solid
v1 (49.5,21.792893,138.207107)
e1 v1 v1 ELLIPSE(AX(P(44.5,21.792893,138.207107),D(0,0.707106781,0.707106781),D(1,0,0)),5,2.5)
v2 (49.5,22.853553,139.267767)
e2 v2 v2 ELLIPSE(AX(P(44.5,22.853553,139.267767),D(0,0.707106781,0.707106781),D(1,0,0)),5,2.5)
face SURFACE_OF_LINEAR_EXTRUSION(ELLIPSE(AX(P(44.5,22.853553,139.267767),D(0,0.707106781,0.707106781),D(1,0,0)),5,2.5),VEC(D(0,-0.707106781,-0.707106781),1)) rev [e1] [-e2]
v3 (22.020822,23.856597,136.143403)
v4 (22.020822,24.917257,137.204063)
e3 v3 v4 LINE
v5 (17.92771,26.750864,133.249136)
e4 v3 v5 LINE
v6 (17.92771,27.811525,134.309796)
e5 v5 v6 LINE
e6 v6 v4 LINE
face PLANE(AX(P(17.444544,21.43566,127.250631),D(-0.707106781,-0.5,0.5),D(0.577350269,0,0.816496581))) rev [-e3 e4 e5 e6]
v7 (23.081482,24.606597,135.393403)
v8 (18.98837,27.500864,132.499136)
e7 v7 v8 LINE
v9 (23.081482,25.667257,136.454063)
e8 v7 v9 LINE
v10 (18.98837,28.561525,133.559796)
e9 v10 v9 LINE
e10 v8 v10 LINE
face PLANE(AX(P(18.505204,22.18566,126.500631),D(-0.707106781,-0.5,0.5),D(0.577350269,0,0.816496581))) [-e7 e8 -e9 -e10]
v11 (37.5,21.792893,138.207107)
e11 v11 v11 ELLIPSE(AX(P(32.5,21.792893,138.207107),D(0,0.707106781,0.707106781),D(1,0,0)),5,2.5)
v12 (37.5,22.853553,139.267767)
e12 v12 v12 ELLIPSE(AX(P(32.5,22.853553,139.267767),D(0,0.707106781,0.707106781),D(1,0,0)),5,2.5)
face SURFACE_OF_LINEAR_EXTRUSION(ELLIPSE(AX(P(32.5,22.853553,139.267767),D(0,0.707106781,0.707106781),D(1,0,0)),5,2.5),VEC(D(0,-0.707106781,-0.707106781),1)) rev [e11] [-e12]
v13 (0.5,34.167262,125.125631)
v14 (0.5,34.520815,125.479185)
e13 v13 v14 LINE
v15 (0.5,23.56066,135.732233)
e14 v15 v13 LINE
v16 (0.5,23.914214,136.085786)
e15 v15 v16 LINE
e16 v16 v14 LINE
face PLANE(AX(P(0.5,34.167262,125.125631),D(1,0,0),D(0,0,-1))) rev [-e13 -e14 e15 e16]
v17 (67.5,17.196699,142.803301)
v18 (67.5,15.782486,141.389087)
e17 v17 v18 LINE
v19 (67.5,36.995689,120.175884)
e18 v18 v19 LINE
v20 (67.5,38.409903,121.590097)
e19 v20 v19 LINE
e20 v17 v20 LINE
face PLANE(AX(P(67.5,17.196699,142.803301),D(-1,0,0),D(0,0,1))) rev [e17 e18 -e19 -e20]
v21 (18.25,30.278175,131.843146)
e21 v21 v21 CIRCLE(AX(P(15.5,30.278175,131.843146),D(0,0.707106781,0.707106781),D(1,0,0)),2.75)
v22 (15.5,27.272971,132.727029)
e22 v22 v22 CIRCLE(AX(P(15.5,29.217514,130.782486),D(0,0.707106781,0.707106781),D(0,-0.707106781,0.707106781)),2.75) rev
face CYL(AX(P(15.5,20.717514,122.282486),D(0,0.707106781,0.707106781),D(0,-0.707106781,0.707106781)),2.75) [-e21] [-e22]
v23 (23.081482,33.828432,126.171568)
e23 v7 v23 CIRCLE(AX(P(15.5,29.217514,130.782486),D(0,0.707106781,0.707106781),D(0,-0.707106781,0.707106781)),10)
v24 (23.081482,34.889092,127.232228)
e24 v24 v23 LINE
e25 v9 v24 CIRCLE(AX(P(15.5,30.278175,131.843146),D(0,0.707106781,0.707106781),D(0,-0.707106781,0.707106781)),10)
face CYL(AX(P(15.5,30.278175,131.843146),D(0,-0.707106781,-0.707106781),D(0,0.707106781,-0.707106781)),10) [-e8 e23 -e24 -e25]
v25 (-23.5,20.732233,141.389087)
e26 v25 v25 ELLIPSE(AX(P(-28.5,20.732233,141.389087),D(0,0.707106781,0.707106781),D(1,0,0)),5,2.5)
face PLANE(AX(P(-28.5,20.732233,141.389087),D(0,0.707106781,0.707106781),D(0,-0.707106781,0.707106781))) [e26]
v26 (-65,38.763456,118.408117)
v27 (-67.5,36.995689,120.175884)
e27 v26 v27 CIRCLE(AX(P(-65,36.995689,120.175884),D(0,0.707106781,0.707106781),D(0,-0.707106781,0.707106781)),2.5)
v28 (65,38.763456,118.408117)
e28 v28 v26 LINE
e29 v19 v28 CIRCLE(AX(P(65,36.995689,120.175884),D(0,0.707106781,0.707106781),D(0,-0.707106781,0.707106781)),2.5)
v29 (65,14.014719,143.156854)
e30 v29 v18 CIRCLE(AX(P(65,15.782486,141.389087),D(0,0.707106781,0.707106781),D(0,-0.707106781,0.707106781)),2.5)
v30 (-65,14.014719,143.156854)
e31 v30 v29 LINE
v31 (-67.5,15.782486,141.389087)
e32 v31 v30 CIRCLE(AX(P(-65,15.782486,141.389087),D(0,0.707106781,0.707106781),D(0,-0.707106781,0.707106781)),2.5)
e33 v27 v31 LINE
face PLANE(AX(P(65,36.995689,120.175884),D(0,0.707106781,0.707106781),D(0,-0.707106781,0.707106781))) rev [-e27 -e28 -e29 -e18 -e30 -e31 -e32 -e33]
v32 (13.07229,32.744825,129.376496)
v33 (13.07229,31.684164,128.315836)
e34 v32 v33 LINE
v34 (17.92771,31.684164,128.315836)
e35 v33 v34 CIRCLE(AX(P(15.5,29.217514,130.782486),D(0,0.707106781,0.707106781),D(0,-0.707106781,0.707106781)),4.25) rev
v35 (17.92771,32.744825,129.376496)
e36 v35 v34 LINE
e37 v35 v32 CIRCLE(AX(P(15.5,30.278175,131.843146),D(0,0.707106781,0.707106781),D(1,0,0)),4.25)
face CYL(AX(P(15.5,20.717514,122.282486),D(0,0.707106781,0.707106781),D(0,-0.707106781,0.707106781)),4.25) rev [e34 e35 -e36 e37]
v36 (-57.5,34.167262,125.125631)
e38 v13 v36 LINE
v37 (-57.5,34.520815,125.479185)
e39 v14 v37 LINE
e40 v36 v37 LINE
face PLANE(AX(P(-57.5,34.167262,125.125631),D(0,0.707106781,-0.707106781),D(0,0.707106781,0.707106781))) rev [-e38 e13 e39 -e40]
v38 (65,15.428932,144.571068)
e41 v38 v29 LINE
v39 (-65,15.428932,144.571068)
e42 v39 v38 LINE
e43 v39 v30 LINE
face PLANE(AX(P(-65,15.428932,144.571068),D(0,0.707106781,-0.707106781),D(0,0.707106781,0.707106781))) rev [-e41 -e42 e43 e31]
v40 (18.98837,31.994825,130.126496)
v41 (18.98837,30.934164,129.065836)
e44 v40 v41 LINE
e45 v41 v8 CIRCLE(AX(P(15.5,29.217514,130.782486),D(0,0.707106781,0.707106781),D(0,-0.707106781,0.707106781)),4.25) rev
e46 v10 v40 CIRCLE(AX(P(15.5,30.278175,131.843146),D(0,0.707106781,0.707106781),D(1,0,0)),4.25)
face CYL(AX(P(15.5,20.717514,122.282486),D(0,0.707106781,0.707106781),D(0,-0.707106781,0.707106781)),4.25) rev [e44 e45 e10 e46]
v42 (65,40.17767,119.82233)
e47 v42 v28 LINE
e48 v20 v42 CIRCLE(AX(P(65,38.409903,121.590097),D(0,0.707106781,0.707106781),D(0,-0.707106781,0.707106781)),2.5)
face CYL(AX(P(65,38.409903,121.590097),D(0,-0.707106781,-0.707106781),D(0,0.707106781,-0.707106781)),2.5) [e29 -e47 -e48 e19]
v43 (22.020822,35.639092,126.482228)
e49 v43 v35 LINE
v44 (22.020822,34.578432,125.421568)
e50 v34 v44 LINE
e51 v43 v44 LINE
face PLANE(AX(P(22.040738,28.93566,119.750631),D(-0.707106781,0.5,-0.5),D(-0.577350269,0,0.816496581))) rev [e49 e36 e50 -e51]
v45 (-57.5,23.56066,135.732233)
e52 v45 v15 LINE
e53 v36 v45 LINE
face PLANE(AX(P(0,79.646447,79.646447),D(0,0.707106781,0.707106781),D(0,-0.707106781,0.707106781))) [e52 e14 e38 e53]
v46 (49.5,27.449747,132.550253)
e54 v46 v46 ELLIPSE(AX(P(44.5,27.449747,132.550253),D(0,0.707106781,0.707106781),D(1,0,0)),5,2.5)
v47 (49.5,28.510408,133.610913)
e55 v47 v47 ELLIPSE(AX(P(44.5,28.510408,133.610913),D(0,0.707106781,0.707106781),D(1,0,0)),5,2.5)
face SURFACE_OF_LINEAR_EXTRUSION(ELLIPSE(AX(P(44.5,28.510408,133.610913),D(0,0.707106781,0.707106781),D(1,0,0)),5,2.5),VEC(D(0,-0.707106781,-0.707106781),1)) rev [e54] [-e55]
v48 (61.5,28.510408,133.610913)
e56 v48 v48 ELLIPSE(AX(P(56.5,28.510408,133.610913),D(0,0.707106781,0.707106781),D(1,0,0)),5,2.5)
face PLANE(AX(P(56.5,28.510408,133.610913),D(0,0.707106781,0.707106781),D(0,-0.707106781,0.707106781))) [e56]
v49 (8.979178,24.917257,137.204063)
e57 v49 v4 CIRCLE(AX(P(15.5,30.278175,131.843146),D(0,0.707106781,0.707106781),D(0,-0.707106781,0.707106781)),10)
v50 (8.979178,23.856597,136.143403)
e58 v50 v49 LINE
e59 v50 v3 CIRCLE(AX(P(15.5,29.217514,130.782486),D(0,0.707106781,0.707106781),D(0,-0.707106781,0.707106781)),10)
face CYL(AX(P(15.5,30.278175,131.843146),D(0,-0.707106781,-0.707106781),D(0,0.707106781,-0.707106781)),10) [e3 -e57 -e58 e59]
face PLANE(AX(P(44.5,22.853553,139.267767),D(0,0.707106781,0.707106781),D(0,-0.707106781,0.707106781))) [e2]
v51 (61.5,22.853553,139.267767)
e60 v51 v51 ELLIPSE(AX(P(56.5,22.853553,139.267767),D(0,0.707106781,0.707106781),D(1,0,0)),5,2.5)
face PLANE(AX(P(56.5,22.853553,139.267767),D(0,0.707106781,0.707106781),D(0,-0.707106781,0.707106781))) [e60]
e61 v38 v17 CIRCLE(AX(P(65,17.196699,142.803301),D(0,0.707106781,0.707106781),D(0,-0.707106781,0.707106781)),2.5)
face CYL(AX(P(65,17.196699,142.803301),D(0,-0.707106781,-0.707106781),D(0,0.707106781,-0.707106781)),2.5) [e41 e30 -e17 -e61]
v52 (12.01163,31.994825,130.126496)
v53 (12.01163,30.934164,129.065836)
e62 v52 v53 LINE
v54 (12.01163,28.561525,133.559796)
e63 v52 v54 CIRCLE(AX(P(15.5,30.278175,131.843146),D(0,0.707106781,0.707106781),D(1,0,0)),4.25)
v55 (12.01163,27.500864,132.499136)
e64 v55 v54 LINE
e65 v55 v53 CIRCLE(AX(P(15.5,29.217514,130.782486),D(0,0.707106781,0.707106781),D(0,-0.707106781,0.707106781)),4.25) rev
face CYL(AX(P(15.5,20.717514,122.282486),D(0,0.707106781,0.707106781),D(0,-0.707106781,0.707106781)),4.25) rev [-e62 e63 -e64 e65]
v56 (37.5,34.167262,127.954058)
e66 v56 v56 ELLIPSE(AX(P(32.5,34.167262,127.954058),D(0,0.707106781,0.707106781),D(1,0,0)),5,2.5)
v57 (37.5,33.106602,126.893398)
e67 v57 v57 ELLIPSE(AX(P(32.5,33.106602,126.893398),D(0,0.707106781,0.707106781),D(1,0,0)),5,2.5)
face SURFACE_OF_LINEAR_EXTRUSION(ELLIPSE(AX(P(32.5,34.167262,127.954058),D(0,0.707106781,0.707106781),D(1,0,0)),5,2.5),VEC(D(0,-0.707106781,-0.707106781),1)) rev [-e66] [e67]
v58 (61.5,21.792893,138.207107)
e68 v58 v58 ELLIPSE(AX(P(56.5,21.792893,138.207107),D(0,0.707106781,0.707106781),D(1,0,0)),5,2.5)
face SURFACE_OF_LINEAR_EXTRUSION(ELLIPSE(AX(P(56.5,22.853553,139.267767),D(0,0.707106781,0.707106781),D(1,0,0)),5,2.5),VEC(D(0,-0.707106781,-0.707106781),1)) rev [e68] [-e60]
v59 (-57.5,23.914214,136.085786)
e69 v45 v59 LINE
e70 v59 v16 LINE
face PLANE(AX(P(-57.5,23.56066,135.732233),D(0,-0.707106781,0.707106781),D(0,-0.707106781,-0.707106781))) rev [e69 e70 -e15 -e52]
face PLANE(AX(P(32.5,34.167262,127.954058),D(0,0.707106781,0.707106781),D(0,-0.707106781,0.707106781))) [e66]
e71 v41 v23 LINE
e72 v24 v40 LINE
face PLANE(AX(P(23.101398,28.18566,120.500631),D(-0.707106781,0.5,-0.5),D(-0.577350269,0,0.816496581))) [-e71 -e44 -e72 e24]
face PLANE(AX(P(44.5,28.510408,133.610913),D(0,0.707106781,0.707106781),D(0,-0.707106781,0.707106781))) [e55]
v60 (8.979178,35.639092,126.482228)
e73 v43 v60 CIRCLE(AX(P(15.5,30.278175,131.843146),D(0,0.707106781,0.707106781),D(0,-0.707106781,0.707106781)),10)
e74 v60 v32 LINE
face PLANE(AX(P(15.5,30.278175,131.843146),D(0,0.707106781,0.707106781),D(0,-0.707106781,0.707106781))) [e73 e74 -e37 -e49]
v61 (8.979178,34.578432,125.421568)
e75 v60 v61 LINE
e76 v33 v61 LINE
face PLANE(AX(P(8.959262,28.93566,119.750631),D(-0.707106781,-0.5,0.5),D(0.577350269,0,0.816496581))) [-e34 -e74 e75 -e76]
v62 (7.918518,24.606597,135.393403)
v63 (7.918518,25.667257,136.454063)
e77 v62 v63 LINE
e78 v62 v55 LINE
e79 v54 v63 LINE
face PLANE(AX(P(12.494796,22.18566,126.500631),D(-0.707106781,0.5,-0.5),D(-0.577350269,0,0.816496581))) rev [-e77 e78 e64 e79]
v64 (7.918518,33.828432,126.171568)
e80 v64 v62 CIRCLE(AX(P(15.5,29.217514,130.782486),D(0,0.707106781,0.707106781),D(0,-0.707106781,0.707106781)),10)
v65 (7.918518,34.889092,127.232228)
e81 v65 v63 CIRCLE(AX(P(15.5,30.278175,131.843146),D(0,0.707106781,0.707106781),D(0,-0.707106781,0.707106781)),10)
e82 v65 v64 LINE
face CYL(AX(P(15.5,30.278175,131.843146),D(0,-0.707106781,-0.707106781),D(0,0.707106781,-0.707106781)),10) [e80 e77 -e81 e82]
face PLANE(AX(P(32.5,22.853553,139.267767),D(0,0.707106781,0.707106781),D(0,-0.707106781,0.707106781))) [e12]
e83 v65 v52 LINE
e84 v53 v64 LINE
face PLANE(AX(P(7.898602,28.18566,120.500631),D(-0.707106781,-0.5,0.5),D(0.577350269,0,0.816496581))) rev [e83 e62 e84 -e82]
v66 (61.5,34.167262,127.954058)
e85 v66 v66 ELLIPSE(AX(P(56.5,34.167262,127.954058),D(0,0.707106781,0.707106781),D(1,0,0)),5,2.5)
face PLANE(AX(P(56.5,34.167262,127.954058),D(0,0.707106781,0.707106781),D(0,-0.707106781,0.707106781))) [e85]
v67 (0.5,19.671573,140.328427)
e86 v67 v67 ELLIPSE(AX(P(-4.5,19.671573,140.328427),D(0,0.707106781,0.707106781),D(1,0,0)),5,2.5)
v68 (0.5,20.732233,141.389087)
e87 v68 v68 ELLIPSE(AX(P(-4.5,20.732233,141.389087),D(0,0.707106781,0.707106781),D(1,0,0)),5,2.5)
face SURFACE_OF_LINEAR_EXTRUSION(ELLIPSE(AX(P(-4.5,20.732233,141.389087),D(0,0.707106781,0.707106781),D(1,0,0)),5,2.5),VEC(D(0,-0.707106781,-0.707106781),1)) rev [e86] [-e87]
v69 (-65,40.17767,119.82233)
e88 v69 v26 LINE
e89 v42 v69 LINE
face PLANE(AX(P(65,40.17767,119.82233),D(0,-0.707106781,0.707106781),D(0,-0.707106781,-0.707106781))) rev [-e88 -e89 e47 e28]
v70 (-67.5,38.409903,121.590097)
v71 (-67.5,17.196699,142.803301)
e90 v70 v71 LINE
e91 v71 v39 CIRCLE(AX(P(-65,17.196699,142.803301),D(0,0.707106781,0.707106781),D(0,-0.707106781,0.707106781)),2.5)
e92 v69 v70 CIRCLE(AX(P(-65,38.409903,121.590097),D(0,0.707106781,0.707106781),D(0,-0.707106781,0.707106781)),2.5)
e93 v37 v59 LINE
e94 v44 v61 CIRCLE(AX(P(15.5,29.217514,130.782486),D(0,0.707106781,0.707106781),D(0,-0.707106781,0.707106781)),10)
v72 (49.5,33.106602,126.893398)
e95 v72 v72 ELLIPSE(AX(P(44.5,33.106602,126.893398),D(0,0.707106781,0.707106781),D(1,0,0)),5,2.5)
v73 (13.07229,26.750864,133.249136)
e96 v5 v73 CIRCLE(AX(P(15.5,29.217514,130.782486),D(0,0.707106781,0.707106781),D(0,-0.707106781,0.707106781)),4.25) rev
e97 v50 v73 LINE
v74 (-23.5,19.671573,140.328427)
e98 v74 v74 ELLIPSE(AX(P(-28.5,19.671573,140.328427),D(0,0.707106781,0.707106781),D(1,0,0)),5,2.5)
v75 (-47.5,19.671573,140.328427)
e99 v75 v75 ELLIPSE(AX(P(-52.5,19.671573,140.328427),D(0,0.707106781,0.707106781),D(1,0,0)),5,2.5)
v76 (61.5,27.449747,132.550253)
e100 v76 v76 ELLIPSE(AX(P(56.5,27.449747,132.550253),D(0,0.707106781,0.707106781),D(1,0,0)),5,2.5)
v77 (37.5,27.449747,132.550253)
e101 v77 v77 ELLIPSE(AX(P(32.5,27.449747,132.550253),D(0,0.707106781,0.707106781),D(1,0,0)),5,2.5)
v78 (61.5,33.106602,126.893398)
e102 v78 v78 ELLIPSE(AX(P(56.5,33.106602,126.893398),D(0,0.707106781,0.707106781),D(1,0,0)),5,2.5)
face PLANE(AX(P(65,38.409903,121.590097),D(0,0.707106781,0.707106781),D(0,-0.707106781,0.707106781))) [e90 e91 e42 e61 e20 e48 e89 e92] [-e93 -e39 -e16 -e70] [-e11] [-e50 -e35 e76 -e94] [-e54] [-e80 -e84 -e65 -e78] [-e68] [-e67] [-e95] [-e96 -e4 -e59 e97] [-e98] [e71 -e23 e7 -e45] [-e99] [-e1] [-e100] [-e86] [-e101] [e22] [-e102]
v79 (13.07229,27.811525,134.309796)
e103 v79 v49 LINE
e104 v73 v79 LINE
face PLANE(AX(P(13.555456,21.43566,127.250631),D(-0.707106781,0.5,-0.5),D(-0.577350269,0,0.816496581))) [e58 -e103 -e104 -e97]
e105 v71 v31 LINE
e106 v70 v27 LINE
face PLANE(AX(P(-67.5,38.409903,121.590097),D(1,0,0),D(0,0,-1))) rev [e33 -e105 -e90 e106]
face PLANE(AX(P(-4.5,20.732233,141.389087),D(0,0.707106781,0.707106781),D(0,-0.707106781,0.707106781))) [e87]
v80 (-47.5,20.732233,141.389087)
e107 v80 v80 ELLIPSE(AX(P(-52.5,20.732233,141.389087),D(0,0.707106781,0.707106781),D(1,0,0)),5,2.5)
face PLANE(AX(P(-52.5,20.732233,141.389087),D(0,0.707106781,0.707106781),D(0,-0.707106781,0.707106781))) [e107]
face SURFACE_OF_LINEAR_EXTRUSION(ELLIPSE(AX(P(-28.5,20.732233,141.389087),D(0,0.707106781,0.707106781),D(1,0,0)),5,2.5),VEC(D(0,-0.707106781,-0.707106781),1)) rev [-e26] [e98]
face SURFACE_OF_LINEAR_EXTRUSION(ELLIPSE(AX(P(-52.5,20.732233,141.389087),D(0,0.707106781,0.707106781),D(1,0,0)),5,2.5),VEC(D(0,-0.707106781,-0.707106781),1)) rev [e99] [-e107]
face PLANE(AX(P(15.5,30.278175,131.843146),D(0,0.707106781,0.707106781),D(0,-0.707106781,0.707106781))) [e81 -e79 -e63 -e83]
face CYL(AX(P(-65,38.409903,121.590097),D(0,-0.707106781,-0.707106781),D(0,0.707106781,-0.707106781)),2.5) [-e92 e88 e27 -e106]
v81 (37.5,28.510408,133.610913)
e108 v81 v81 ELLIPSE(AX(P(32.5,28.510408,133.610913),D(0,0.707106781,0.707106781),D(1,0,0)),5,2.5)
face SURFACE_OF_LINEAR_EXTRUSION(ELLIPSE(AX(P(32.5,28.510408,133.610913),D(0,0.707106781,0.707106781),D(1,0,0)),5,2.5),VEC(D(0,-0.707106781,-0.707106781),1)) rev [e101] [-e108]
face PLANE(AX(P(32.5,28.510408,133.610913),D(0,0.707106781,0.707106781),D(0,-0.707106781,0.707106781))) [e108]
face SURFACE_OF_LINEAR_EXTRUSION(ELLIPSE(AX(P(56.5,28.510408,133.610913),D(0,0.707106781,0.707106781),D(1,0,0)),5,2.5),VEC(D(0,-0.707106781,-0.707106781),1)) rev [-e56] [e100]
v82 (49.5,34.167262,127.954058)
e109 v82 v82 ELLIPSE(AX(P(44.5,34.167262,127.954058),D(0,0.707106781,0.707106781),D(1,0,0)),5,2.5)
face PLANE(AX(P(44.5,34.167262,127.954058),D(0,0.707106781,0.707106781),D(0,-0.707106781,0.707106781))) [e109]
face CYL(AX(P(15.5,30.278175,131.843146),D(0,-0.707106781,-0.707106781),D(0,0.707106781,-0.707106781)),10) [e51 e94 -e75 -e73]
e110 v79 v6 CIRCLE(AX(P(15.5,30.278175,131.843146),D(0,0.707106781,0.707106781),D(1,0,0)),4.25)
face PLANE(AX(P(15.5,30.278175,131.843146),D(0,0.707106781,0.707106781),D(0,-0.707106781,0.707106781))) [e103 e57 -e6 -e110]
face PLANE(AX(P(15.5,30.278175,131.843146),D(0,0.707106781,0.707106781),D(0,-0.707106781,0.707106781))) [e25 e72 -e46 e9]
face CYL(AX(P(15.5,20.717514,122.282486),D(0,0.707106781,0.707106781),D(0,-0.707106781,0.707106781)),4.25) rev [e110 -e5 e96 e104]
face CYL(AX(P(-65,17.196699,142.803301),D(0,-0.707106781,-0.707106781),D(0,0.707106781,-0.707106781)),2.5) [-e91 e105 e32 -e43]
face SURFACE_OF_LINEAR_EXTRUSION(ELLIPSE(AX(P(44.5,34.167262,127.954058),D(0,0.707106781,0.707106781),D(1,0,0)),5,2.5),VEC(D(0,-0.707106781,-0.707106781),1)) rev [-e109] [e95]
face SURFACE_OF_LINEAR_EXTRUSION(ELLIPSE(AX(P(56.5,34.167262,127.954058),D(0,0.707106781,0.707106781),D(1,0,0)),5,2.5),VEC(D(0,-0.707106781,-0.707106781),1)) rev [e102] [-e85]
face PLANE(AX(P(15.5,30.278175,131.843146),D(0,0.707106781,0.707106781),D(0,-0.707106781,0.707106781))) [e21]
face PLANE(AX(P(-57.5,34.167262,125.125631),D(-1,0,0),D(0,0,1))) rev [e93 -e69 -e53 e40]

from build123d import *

# Parameters (mm, degrees)
BOSS_EXTRUDE1_DEPTH     = 90
FILLET1_R               = 7.5
FILLET2_R               = 2
SKETCH2_W               = 20
SKETCH2_H               = 80
SKETCH2_W_2             = 32
BOSS_EXTRUDE2_DEPTH     = 20
SKETCH3_R               = 2.5
BOSS_EXTRUDE3_DEPTH     = 111
BOSS_EXTRUDE4_START     = 7.5
SKETCH4_W               = 80
SKETCH4_H               = 20
SKETCH4_R               = 3.25
BOSS_EXTRUDE4_DEPTH     = 20
MOVE_FACE1_BY           = 1.5
MOVE_FACE2_BY           = 1.5
FILLET3_R               = 4
FILLET4_R               = 4
CUT_EXTRUDE1_DEPTH      = 2
BOSS_EXTRUDE5_DEPTH     = 2
SKETCH7_W               = 58
SKETCH7_H               = 15
CUT_EXTRUDE2_DEPTH      = 0.5
SKETCH8_R               = 10
BOSS_EXTRUDE6_DEPTH     = 1.5
SKETCH10_R              = 4.25
SKETCH10_R_2            = 2.75
CUT_EXTRUDE_THIN1_DEPTH = 1.5
SKETCH11_RX             = 5
SKETCH11_RY             = 2.5
BOSS_EXTRUDE7_DEPTH     = 1.5
LPATTERN1_COUNT         = 3
LPATTERN1_PITCH         = 24
SKETCH12_RX             = 5
SKETCH12_RY             = 2.5
BOSS_EXTRUDE8_DEPTH     = 1.5
LPATTERN2_COUNT         = 3
LPATTERN2_PITCH         = 12
LPATTERN2_COUNT_DIR2    = 3
LPATTERN2_PITCH_DIR2    = 8
FILLET7_R               = 7.5
FILLET5_R               = 5
FILLET6_R               = 2
SHELL1_T                = -1
SKETCH14_R              = 14
BOSS_EXTRUDE9_DEPTH     = 1
BOSS_EXTRUDE10_DEPTH    = 1
BOSS_EXTRUDE11_START    = -30
SKETCH16_R              = 13
BOSS_EXTRUDE11_DEPTH    = 10
BOSS_EXTRUDE12_REACH    = 233.484
SKETCH18_R              = 3
SKETCH17_W              = 1.5
SKETCH17_H              = 20
SKETCH17_W_2            = 20
SKETCH17_H_2            = 1.5
EXTRUDE_THIN1_DEPTH     = 63.5
SKETCH20_R              = 12.5
BOSS_EXTRUDE13_DEPTH    = 5
FILLET8_R               = 2


# Read off the part's stored shape, not the designer's step: Body-Move/Copy1
with BuildPart() as part:
    # Sketch1 → Boss-Extrude1 (new, symmetric)
    with BuildSketch(Plane(origin=(0, 0, 0), x_dir=(0, 0, -1), z_dir=(1, 0, 0))):
        Polygon((0, 0), (0, 45), (-115, 45), (-160, 0), align=None)
    extrude(amount=BOSS_EXTRUDE1_DEPTH, both=True)

    # Fillet1
    fillet1_edges = [part.edges().sort_by_distance(p)[0] for p in [
        (0, 0, 160),
        (0, 45, 115),
        (0, 45, 0),
        (0, 0, 0),
    ]]
    fillet(fillet1_edges, radius=FILLET1_R)

    # Fillet2
    fillet2_edges = [part.edges().sort_by_distance(p)[0] for p in [
        (-90, 0, 74.696699141),
        (90, 0, 74.696699141),
        (-90, 27.803300859, 132.196699141),
        (-90, 45, 59.696699141),
        (-90, 22.5, 0),
        (-90, 44.429096494, 114.763524025),
        (-90, 2.196699141, 2.196699141),
        (-90, 42.803300859, 2.196699141),
        (-90, 4.629874257, 148.822494776),
        (90, 27.803300859, 132.196699141),
        (90, 22.5, 0),
        (90, 45, 59.696699141),
        (90, 44.429096494, 114.763524025),
        (90, 2.196699141, 2.196699141),
        (90, 42.803300859, 2.196699141),
        (90, 4.629874257, 148.822494776),
    ]]
    fillet(fillet2_edges, radius=FILLET2_R)

    # Sketch2 → Boss-Extrude2 (add)
    with BuildSketch(Plane(origin=(0, 45, 0), x_dir=(1, 0, 0), z_dir=(0, 1, 0))):
        with Locations((-71.5, -59.696699141)):
            Rectangle(SKETCH2_W, SKETCH2_H)
        with Locations((65.5, -59.696699141)):
            Rectangle(SKETCH2_W_2, SKETCH2_H)
    extrude(amount=BOSS_EXTRUDE2_DEPTH)

    # Sketch3 → Boss-Extrude3 (add)
    with BuildSketch(Plane(origin=(-61.5, 0, 0), x_dir=(0, 0, -1), z_dir=(1, 0, 0))):
        with Locations(Location((-89.696699141, 59.5, 0), (0, 0, 180))):
            Circle(SKETCH3_R)
        with Locations(Location((-89.696699141, 50.5, 0), (0, 0, 180))):
            Circle(SKETCH3_R)
        with Locations(Location((-29.696699141, 50.5, 0), (0, 0, 180))):
            Circle(SKETCH3_R)
        with Locations(Location((-29.696699141, 59.5, 0), (0, 0, 180))):
            Circle(SKETCH3_R)
    extrude(amount=BOSS_EXTRUDE3_DEPTH)

    # Fillet3
    fillet3_edges = [part.edges().sort_by_distance(p)[0] for p in [
        (65.5, 65, 99.696699141),
        (65.5, 65, 19.696699141),
        (-71.5, 65, 99.696699141),
        (-71.5, 65, 19.696699141),
    ]]
    fillet(fillet3_edges, radius=FILLET3_R)

    # Sketch5 → Cut-Extrude1 (cut)
    with BuildSketch(Plane(origin=(0, 80, 80), x_dir=(1, 0, 0), z_dir=(0, 0.7071067811865511, 0.707106781186544))):
        with BuildLine():
            Line((-65, -56.317279836), (65, -56.317279836))
            ThreePointArc((65, -56.317279836), (66.767766953, -57.049512883), (67.5, -58.817279836))
            Line((67.5, -58.817279836), (67.5, -88.817279836))
            ThreePointArc((67.5, -88.817279836), (66.767766953, -90.585046789), (65, -91.317279836))
            Line((65, -91.317279836), (-65, -91.317279836))
            ThreePointArc((-65, -91.317279836), (-66.767766953, -90.585046789), (-67.5, -88.817279836))
            Line((-67.5, -88.817279836), (-67.5, -58.817279836))
            ThreePointArc((-67.5, -58.817279836), (-66.767766953, -57.049512883), (-65, -56.317279836))
        make_face()
    extrude(amount=-CUT_EXTRUDE1_DEPTH, mode=Mode.SUBTRACT)


with BuildPart() as body_2:
    # Sketch4 → Boss-Extrude4 (new body)
    with BuildSketch(Plane(origin=(-61.5, 0, 0), x_dir=(0, 0, -1), z_dir=(1, 0, 0)).offset(BOSS_EXTRUDE4_START)):
        with Locations((-59.696699141, 55)):
            Rectangle(SKETCH4_W, SKETCH4_H)
        with Locations((-89.696699141, 59.5)):
            Circle(SKETCH4_R, mode=Mode.SUBTRACT)
        with Locations((-89.696699141, 50.5)):
            Circle(SKETCH4_R, mode=Mode.SUBTRACT)
        with Locations((-29.696699141, 59.5)):
            Circle(SKETCH4_R, mode=Mode.SUBTRACT)
        with Locations((-29.696699141, 50.5)):
            Circle(SKETCH4_R, mode=Mode.SUBTRACT)
    extrude(amount=BOSS_EXTRUDE4_DEPTH)

    # Move Face1: a face moved outward by 1.5
    extrude(body_2.faces().sort_by_distance((-44, 65, 59.696699141))[0], amount=MOVE_FACE1_BY, dir=(0, 1, 0))

    # Move Face2: a face moved inward by 1.5
    extrude(body_2.faces().sort_by_distance((-44, 45, 59.696699141))[0], amount=MOVE_FACE2_BY, dir=(0, 1, 0), mode=Mode.SUBTRACT)

    # Fillet4
    fillet4_edges = [body_2.edges().sort_by_distance(p)[0] for p in [
        (-44, 66.5, 99.696699141),
        (-44, 66.5, 19.696699141),
        (-44, 46.5, 19.696699141),
        (-44, 46.5, 99.696699141),
    ]]
    fillet(fillet4_edges, radius=FILLET4_R)


with BuildPart() as body_3:
    # Sketch6 → Boss-Extrude5 (new body)
    with BuildSketch(Plane(origin=(0, 78.585786438, 78.585786438), x_dir=(1, 0, 0), z_dir=(0, 0.7071067811865509, 0.7071067811865441))):
        with BuildLine():
            Line((65, -56.317279836), (-65, -56.317279836))
            ThreePointArc((-65, -56.317279836), (-66.767766953, -57.049512883), (-67.5, -58.817279836))
            Line((-67.5, -58.817279836), (-67.5, -88.817279836))
            ThreePointArc((-67.5, -88.817279836), (-66.767766953, -90.585046789), (-65, -91.317279836))
            Line((-65, -91.317279836), (65, -91.317279836))
            ThreePointArc((65, -91.317279836), (66.767766953, -90.585046789), (67.5, -88.817279836))
            Line((67.5, -88.817279836), (67.5, -58.817279836))
            ThreePointArc((67.5, -58.817279836), (66.767766953, -57.049512883), (65, -56.317279836))
        make_face()
    extrude(amount=BOSS_EXTRUDE5_DEPTH)

    # Sketch7 → Cut-Extrude2 (cut)
    with BuildSketch(Plane(origin=(0, 80, 80), x_dir=(1, 0, 0), z_dir=(0, 0.7071067811865509, 0.7071067811865441))):
        with Locations((-28.5, -71.817279836)):
            Rectangle(SKETCH7_W, SKETCH7_H)
    extrude(amount=-CUT_EXTRUDE2_DEPTH, mode=Mode.SUBTRACT)

    # Sketch8 → Boss-Extrude6 (add)
    with BuildSketch(Plane(origin=(0, 80, 80), x_dir=(1, 0, 0), z_dir=(0, 0.7071067811865509, 0.7071067811865441))):
        with Locations(Location((15.5, -71.817279836, 0), (0, 0, 270))):
            Circle(SKETCH8_R)
    extrude(amount=BOSS_EXTRUDE6_DEPTH)

    # Sketch10 → Cut-Extrude-Thin1 (cut)
    # profile 1 of 5: a face of its own
    with BuildSketch(Plane(origin=(0, 81.060660172, 81.060660172), x_dir=(1, 0, 0), z_dir=(0, 0.7071067811865509, 0.7071067811865441))):
        with Locations((15.5, -71.817279836)):
            Circle(SKETCH10_R)
        with Locations((15.5, -71.817279836)):
            Circle(SKETCH10_R_2, mode=Mode.SUBTRACT)
    # profile 2 of 5: a face of its own
    with BuildSketch(Plane(origin=(0, 81.060660172, 81.060660172), x_dir=(1, 0, 0), z_dir=(0, 0.7071067811865509, 0.7071067811865441))):
        Polygon((7.898602102, -65.27654211), (12.49479618, -69.872736188), (13.555456352, -68.812076016), (8.959262274, -64.215881939), align=None)
    # profile 3 of 5: a face of its own
    with BuildSketch(Plane(origin=(0, 81.060660172, 81.060660172), x_dir=(1, 0, 0), z_dir=(0, 0.7071067811865509, 0.7071067811865441))):
        Polygon((22.040737726, -64.215881939), (17.444543648, -68.812076016), (18.50520382, -69.872736188), (23.101397898, -65.27654211), align=None)
    # profile 4 of 5: a face of its own
    with BuildSketch(Plane(origin=(0, 81.060660172, 81.060660172), x_dir=(1, 0, 0), z_dir=(0, 0.7071067811865509, 0.7071067811865441))):
        Polygon((17.444543648, -74.822483656), (22.040737726, -79.418677734), (23.101397898, -78.358017562), (18.50520382, -73.761823485), align=None)
    # profile 5 of 5: a face of its own
    with BuildSketch(Plane(origin=(0, 81.060660172, 81.060660172), x_dir=(1, 0, 0), z_dir=(0, 0.7071067811865509, 0.7071067811865441))):
        Polygon((12.49479618, -73.761823485), (7.898602102, -78.358017562), (8.959262274, -79.418677734), (13.555456352, -74.822483656), align=None)
    extrude(amount=-CUT_EXTRUDE_THIN1_DEPTH, mode=Mode.SUBTRACT)

    # Sketch11 → Boss-Extrude7 (add)
    with BuildSketch(Plane(origin=(0, 80, 80), x_dir=(1, 0, 0), z_dir=(0, 0.7071067811865509, 0.7071067811865441))):
        with Locations((-52.5, -85.317279836)):
            Ellipse(SKETCH11_RX, SKETCH11_RY)
    boss_extrude7 = extrude(amount=BOSS_EXTRUDE7_DEPTH)

    # LPattern1: Boss-Extrude7 ×3
    with Locations(*[(i * LPATTERN1_PITCH, 0, 0) for i in range(1, LPATTERN1_COUNT)]):
        add(boss_extrude7)

    # Sketch12 → Boss-Extrude8 (add)
    with BuildSketch(Plane(origin=(0, 80, 80), x_dir=(1, 0, 0), z_dir=(0, 0.7071067811865509, 0.7071067811865441))):
        with Locations((32.5, -66.317279836)):
            Ellipse(SKETCH12_RX, SKETCH12_RY)
    boss_extrude8 = extrude(amount=BOSS_EXTRUDE8_DEPTH)

    # LPattern2: Boss-Extrude8 3 × 3
    with Locations(*[Vector(1, 0, 0) * (i * LPATTERN2_PITCH) + Vector(0, -0.7071067811865442, 0.7071067811865508) * (j * LPATTERN2_PITCH_DIR2) for i in range(LPATTERN2_COUNT) for j in range(LPATTERN2_COUNT_DIR2) if (i, j) != (0, 0)]):
        add(boss_extrude8)


with BuildPart() as body_4:
    # Sketch13 → Revolve1 (revolve)
    with BuildSketch(Plane.XY.offset(59.696699141), mode=Mode.PRIVATE) as revolve1_sk:
        Polygon((11.5, 70), (11.5, 85), (105.301145933, 85), (111.5, 74.263269807), (121.5, 72.5), (121.5, 70), align=None)
    revolve(revolve1_sk.sketch.rotate(Axis((11.5, 70, 59.696699141), (1, 0, 0)), 90), axis=Axis((11.5, 70, 59.696699141), (1, 0, 0)))

    # Fillet5
    fillet5_edges = [body_4.edges().sort_by_distance(p)[0] for p in [
        (105.301145933, 70, 44.696699141),
    ]]
    fillet(fillet5_edges, radius=FILLET5_R)

    # Fillet6
    fillet6_edges = [body_4.edges().sort_by_distance(p)[0] for p in [
        (111.5, 70, 55.433429334),
    ]]
    fillet(fillet6_edges, radius=FILLET6_R)

    # Shell1
    shell1_openings = [body_4.faces().sort_by_distance(p)[0] for p in [
        (121.5, 70, 59.696699141),
        (11.5, 70, 59.696699141),
    ]]
    offset(amount=SHELL1_T, openings=shell1_openings, kind=Kind.INTERSECTION)

    # Sketch14 → Boss-Extrude9 (add)
    with BuildSketch(Plane.ZY.offset(-11.5)):
        with BuildLine():
            Line((55.696699141, 85.491933385), (40.696699141, 81.618950039))
            ThreePointArc((40.696699141, 81.618950039), (31.696699141, 70), (40.696699141, 58.381049961))
            Line((40.696699141, 58.381049961), (55.696699141, 54.508066615))
            ThreePointArc((55.696699141, 54.508066615), (59.696699141, 54), (63.696699141, 54.508066615))
            Line((63.696699141, 54.508066615), (78.696699141, 58.381049961))
            ThreePointArc((78.696699141, 58.381049961), (87.696699141, 70), (78.696699141, 81.618950039))
            Line((78.696699141, 81.618950039), (63.696699141, 85.491933385))
            ThreePointArc((63.696699141, 85.491933385), (59.696699141, 86), (55.696699141, 85.491933385))
        make_face()
        with Locations((59.696699141, 70)):
            Circle(SKETCH14_R, mode=Mode.SUBTRACT)
    extrude(amount=BOSS_EXTRUDE9_DEPTH)


with BuildPart() as body_5:
    # Body-Move/Copy1 outline → Body-Move/Copy1 (revolve)
    with BuildSketch(Plane(origin=(0, 70, 59.696699141), x_dir=(0, 1, 0), z_dir=(0, 0, -1))):
        Polygon((0, 121.5), (0, 11.5), (15, 11.5), (15, 105.301145933), (4.263269807, 111.5), (2.5, 121.5), align=None)
    revolve(axis=Axis((0, 70, 59.696699141), (1, 0, 0)))


with BuildPart() as part_1:
    add(part.part)

    # Combine1: cut body 5
    add(body_5.part, mode=Mode.SUBTRACT)

    # Fillet7
    fillet7_edges = [part_1.edges().sort_by_distance(p)[0] for p in [
        (65.5, 65, 73.838834765),
        (65.5, 65, 45.554563517),
    ]]
    fillet(fillet7_edges, radius=FILLET7_R)

    # Sketch20 → Boss-Extrude13 (add)
    with BuildSketch(Plane.XZ):
        with Locations(Location((-60, 116.893398282, 0), (0, 0, 90))):
            Circle(SKETCH20_R)
        with Locations(Location((-60, 32.5, 0), (0, 0, 90))):
            Circle(SKETCH20_R)
        with Locations(Location((60, 32.5, 0), (0, 0, 90))):
            Circle(SKETCH20_R)
        with Locations(Location((60, 116.893398282, 0), (0, 0, 90))):
            Circle(SKETCH20_R)
    extrude(amount=BOSS_EXTRUDE13_DEPTH)

    # Fillet8
    fillet8_edges = [part_1.edges().sort_by_distance(p)[0] for p in [
        (-60, -5, 104.393398282),
        (-60, -5, 20),
        (60, -5, 20),
        (60, -5, 104.393398282),
    ]]
    fillet(fillet8_edges, radius=FILLET8_R)


with BuildPart() as body_5_2:
    # Sketch15 → Boss-Extrude10 (new body)
    with BuildSketch(Plane(origin=(-34, 0, 0), x_dir=(0, 0, -1), z_dir=(1, 0, 0))):
        with BuildLine():
            Line((-63.696699141, 85.491933385), (-78.696699141, 81.618950039))
            ThreePointArc((-78.696699141, 81.618950039), (-87.696699141, 70), (-78.696699141, 58.381049961))
            Line((-78.696699141, 58.381049961), (-63.696699141, 54.508066615))
            ThreePointArc((-63.696699141, 54.508066615), (-59.696699141, 54), (-55.696699141, 54.508066615))
            Line((-55.696699141, 54.508066615), (-40.696699141, 58.381049961))
            ThreePointArc((-40.696699141, 58.381049961), (-31.696699141, 70), (-40.696699141, 81.618950039))
            Line((-40.696699141, 81.618950039), (-55.696699141, 85.491933385))
            ThreePointArc((-55.696699141, 85.491933385), (-59.696699141, 86), (-63.696699141, 85.491933385))
        make_face()
    extrude(amount=BOSS_EXTRUDE10_DEPTH)


with BuildPart() as body_6:
    # Sketch16 → Boss-Extrude11 (new body)
    with BuildSketch(Plane.ZY.offset(-10.5).offset(BOSS_EXTRUDE11_START)):
        with Locations((59.696699141, 70)):
            Circle(SKETCH16_R)
    extrude(amount=BOSS_EXTRUDE11_DEPTH)

    # Sketch18 → Boss-Extrude12 (add, up to next)
    with BuildSketch(Plane(origin=(-33, 0, 0), x_dir=(0, 0, -1), z_dir=(1, 0, 0)), mode=Mode.PRIVATE) as boss_extrude12_sk1:
        with Locations(Location((-59.696699141, 70, 0), (0, 0, 180))):
            Circle(SKETCH18_R)
    boss_extrude12_tool1 = extrude(boss_extrude12_sk1.sketch, amount=BOSS_EXTRUDE12_REACH, mode=Mode.PRIVATE) - body_6.part

    add(body_5_2.part)  # Boss-Extrude12 merges body 5 2
    add(boss_extrude12_tool1.solids().sort_by_distance((-33, 70, 59.696699))[0])

    # Sketch17 → Extrude-Thin1 (add)
    with BuildSketch(Plane(origin=(-33, 0, 0), x_dir=(0, 0, -1), z_dir=(1, 0, 0))):
        with Locations((-59.696699141, 70)):
            Rectangle(SKETCH17_W, SKETCH17_H)
        with Locations((-59.696699141, 70)):
            Rectangle(SKETCH17_W_2, SKETCH17_H_2)
    extrude(amount=EXTRUDE_THIN1_DEPTH)

    # Sketch19 → Cut-Revolve3 (revolve, cut)
    with BuildSketch(Plane.XY.offset(59.696699141), mode=Mode.PRIVATE) as cut_revolve3_sk:
        Polygon((-33, 76.452368755), (-18, 80), (-18, 81.618950039), (-33, 81.618950039), align=None)
    revolve(cut_revolve3_sk.sketch.rotate(Axis((111.5, 70, 59.696699141), (-1, 0, 0)), 270), axis=Axis((111.5, 70, 59.696699141), (-1, 0, 0)), mode=Mode.SUBTRACT)


solid = body_3.part
